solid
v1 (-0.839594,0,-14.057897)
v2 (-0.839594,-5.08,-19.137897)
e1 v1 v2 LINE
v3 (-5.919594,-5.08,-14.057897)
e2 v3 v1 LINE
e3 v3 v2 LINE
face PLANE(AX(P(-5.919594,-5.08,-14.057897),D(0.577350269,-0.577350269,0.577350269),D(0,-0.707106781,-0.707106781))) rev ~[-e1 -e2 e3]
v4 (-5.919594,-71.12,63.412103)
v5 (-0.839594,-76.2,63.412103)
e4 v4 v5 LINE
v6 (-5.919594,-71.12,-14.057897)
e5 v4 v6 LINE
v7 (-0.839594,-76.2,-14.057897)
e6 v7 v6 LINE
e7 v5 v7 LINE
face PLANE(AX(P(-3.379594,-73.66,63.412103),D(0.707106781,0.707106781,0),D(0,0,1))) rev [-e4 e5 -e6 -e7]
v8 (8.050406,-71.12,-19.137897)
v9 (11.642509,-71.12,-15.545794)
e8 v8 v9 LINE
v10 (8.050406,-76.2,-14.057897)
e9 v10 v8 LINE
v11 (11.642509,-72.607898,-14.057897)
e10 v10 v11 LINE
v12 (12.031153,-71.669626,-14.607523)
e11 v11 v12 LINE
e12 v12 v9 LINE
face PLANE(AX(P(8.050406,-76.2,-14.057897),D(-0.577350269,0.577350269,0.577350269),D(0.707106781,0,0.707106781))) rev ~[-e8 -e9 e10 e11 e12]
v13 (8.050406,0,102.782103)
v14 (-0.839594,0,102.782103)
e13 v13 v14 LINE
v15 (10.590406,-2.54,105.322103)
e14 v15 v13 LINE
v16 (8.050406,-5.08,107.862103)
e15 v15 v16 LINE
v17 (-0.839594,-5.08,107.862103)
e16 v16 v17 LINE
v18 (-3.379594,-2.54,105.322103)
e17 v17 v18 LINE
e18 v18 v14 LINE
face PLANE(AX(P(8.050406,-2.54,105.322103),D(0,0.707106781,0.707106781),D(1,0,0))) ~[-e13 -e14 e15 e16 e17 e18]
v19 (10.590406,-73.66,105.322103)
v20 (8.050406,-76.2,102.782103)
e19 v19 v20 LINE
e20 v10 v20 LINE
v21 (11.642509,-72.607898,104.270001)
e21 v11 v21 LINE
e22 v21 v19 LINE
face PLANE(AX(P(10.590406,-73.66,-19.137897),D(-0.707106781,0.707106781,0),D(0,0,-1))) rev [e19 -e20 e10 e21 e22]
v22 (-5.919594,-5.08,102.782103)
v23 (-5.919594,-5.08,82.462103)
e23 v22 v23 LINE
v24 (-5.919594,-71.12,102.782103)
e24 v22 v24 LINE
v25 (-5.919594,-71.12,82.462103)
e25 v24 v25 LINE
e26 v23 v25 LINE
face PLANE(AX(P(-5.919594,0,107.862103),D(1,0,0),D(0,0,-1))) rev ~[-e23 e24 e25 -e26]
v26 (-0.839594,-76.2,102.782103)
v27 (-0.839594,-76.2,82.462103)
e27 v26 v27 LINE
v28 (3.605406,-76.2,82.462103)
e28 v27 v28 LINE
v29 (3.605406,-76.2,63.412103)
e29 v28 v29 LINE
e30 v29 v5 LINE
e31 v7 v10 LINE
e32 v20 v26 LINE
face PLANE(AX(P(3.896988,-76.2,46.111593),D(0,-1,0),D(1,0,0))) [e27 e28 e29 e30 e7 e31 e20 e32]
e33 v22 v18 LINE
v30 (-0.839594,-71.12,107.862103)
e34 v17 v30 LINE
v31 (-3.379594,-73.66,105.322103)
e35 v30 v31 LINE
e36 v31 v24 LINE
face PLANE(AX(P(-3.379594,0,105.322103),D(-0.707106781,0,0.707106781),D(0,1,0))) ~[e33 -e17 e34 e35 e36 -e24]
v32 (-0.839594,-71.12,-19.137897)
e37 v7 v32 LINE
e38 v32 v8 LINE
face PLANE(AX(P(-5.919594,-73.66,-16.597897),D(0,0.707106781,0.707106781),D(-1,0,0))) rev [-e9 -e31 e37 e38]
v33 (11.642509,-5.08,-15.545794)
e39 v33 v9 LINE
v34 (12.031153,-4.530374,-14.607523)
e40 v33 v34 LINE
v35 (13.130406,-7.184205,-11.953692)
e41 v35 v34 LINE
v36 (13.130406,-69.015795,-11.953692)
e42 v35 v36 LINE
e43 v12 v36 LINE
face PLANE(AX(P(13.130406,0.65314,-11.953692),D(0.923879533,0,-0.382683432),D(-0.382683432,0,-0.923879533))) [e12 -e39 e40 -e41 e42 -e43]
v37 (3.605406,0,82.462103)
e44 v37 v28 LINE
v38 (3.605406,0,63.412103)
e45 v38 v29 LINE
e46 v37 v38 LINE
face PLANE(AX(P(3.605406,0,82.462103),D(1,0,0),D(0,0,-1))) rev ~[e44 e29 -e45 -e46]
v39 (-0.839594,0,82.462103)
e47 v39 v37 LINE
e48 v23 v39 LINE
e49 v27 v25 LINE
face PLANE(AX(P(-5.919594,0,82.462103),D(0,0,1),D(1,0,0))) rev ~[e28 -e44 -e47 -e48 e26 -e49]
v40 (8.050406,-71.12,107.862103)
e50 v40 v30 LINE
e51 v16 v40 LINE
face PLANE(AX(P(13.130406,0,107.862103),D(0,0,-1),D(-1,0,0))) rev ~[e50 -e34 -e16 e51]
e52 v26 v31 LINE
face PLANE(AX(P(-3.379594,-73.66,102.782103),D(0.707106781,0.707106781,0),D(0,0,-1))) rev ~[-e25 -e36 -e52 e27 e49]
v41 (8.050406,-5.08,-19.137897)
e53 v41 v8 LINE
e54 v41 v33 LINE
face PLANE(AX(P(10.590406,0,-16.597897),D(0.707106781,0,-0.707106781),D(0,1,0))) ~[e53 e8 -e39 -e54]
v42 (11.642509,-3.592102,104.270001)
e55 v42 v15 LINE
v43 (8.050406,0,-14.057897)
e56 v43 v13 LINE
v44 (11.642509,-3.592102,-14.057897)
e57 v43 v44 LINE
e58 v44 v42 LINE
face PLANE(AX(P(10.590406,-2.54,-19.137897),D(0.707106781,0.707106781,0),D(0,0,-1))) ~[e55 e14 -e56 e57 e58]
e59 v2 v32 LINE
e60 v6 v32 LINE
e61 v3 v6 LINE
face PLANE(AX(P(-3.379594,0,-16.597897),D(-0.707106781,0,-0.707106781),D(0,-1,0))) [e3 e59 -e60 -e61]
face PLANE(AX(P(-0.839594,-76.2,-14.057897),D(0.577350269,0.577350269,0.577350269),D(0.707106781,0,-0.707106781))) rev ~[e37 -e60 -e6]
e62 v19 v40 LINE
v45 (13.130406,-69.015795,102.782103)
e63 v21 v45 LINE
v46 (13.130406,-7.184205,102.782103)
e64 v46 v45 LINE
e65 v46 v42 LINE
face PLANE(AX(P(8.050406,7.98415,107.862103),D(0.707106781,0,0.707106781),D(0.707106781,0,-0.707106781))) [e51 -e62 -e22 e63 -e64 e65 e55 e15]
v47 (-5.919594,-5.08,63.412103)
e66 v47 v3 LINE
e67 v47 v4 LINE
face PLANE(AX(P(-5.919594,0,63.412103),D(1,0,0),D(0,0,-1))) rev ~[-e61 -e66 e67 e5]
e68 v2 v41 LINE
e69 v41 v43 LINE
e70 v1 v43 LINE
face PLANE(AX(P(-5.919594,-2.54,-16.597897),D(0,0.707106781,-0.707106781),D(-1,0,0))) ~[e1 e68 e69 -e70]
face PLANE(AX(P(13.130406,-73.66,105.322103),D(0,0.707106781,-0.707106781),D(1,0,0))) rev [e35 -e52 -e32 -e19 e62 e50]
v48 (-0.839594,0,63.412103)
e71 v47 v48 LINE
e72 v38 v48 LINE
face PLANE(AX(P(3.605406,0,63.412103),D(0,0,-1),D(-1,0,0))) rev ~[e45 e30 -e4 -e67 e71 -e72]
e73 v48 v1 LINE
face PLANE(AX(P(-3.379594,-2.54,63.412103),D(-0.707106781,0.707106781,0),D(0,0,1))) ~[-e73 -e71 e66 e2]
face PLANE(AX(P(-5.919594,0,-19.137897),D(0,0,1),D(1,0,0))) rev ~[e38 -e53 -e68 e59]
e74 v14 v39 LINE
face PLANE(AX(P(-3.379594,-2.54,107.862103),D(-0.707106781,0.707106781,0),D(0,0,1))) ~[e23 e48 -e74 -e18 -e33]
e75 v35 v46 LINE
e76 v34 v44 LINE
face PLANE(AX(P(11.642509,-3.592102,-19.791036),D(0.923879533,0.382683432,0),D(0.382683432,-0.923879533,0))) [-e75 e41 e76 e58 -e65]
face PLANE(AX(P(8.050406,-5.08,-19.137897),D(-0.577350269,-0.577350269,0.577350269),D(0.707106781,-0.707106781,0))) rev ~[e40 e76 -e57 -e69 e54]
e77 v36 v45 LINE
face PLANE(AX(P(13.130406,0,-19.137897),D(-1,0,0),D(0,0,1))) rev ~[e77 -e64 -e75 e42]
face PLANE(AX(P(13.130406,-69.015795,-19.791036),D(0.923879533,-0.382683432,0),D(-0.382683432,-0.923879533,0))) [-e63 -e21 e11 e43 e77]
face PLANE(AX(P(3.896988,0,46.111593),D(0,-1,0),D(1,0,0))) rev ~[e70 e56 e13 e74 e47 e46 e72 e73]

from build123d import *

# Parameters (mm, degrees)
F1_DEPTH    = 76.2
F2_SIZE     = 5.08
F3_SIZE     = 5.08
F4_SIZE     = 5.08
F5_T1_DEPTH = 92.1682991577
F5_T3_DEPTH = 133.3862799398
F5_T5_DEPTH = 77.5062799398


# Not quite as in the source:
# - a fillet or chamfer that OpenCascade refuses, or shapes differently, is made with other operations: its cross-section is extruded or revolved along the edge and cut away or added


with BuildPart() as f1:
    # F0 (on Front) → F1 (new body)
    with BuildSketch(Plane.XZ):
        Polygon((-5.919593852, -19.1378965259), (13.130406148, -19.1378965259), (13.130406148, 107.8621034741), (-5.919593852, 107.8621034741), (-5.919593852, 82.4621034741), (3.605406148, 82.4621034741), (3.605406148, 63.4121034741), (-5.919593852, 63.4121034741), align=None)
    extrude(amount=F1_DEPTH)

    # F2
    f2_edges = [f1.edges().sort_by_distance(p)[0] for p in [
        (-5.919594, 0, 95.162103),
        (13.130406, 0, 44.362103),
        (3.605406, 0, -19.137897),
        (-5.919594, 0, 22.137103),
        (-5.919594, -38.1, -19.137897),
        (-5.919594, -76.2, 22.137103),
        (13.130406, -38.1, -19.137897),
        (3.605406, -76.2, -19.137897),
        (13.130406, -76.2, 44.362103),
        (3.605406, -76.2, 107.862103),
        (-5.919594, -38.1, 107.862103),
    ]]
    chamfer(f2_edges, length=F2_SIZE)

    # F3
    f3_edges = [f1.edges().sort_by_distance(p)[0] for p in [
        (-5.919594, -76.2, 92.622103),
    ]]
    chamfer(f3_edges, length=F3_SIZE)

    # F4
    f4_edges = [f1.edges().sort_by_distance(p)[0] for p in [
        (3.605406, 0, 107.862103),
    ]]
    chamfer(f4_edges, length=F4_SIZE)

    # F5: chamfer of 5.08 on 4 edges, made by hand

    # F5_s2 → F5_t1 (cut)
    with BuildSketch(Plane.XZ.offset(-7.9841495789)):
        Polygon((8.050406148, 107.8621034741), (13.130406148, 102.7821034741), (13.130406148, 107.8621034741), align=None)
    extrude(amount=F5_T1_DEPTH, mode=Mode.SUBTRACT)

    # F5_s4 → F5_t3 (cut)
    with BuildSketch(Plane.XY.offset(-19.7910364957)):
        Polygon((13.130406148, -69.0157951031), (11.6425085964, -72.6078975516), (13.130406148, -71.12), align=None)
        Polygon((11.6425085964, -3.5921024484), (13.130406148, -7.1842048969), (13.130406148, -5.08), align=None)
    extrude(amount=F5_T3_DEPTH, mode=Mode.SUBTRACT)

    # F5_s6 → F5_t5 (cut)
    with BuildSketch(Plane.XZ.offset(-0.6531399699)):
        Polygon((13.130406148, -11.953691629), (11.6425085964, -15.5457940774), (13.130406148, -14.0578965259), align=None)
    extrude(amount=F5_T5_DEPTH, mode=Mode.SUBTRACT)


solid = f1.part
